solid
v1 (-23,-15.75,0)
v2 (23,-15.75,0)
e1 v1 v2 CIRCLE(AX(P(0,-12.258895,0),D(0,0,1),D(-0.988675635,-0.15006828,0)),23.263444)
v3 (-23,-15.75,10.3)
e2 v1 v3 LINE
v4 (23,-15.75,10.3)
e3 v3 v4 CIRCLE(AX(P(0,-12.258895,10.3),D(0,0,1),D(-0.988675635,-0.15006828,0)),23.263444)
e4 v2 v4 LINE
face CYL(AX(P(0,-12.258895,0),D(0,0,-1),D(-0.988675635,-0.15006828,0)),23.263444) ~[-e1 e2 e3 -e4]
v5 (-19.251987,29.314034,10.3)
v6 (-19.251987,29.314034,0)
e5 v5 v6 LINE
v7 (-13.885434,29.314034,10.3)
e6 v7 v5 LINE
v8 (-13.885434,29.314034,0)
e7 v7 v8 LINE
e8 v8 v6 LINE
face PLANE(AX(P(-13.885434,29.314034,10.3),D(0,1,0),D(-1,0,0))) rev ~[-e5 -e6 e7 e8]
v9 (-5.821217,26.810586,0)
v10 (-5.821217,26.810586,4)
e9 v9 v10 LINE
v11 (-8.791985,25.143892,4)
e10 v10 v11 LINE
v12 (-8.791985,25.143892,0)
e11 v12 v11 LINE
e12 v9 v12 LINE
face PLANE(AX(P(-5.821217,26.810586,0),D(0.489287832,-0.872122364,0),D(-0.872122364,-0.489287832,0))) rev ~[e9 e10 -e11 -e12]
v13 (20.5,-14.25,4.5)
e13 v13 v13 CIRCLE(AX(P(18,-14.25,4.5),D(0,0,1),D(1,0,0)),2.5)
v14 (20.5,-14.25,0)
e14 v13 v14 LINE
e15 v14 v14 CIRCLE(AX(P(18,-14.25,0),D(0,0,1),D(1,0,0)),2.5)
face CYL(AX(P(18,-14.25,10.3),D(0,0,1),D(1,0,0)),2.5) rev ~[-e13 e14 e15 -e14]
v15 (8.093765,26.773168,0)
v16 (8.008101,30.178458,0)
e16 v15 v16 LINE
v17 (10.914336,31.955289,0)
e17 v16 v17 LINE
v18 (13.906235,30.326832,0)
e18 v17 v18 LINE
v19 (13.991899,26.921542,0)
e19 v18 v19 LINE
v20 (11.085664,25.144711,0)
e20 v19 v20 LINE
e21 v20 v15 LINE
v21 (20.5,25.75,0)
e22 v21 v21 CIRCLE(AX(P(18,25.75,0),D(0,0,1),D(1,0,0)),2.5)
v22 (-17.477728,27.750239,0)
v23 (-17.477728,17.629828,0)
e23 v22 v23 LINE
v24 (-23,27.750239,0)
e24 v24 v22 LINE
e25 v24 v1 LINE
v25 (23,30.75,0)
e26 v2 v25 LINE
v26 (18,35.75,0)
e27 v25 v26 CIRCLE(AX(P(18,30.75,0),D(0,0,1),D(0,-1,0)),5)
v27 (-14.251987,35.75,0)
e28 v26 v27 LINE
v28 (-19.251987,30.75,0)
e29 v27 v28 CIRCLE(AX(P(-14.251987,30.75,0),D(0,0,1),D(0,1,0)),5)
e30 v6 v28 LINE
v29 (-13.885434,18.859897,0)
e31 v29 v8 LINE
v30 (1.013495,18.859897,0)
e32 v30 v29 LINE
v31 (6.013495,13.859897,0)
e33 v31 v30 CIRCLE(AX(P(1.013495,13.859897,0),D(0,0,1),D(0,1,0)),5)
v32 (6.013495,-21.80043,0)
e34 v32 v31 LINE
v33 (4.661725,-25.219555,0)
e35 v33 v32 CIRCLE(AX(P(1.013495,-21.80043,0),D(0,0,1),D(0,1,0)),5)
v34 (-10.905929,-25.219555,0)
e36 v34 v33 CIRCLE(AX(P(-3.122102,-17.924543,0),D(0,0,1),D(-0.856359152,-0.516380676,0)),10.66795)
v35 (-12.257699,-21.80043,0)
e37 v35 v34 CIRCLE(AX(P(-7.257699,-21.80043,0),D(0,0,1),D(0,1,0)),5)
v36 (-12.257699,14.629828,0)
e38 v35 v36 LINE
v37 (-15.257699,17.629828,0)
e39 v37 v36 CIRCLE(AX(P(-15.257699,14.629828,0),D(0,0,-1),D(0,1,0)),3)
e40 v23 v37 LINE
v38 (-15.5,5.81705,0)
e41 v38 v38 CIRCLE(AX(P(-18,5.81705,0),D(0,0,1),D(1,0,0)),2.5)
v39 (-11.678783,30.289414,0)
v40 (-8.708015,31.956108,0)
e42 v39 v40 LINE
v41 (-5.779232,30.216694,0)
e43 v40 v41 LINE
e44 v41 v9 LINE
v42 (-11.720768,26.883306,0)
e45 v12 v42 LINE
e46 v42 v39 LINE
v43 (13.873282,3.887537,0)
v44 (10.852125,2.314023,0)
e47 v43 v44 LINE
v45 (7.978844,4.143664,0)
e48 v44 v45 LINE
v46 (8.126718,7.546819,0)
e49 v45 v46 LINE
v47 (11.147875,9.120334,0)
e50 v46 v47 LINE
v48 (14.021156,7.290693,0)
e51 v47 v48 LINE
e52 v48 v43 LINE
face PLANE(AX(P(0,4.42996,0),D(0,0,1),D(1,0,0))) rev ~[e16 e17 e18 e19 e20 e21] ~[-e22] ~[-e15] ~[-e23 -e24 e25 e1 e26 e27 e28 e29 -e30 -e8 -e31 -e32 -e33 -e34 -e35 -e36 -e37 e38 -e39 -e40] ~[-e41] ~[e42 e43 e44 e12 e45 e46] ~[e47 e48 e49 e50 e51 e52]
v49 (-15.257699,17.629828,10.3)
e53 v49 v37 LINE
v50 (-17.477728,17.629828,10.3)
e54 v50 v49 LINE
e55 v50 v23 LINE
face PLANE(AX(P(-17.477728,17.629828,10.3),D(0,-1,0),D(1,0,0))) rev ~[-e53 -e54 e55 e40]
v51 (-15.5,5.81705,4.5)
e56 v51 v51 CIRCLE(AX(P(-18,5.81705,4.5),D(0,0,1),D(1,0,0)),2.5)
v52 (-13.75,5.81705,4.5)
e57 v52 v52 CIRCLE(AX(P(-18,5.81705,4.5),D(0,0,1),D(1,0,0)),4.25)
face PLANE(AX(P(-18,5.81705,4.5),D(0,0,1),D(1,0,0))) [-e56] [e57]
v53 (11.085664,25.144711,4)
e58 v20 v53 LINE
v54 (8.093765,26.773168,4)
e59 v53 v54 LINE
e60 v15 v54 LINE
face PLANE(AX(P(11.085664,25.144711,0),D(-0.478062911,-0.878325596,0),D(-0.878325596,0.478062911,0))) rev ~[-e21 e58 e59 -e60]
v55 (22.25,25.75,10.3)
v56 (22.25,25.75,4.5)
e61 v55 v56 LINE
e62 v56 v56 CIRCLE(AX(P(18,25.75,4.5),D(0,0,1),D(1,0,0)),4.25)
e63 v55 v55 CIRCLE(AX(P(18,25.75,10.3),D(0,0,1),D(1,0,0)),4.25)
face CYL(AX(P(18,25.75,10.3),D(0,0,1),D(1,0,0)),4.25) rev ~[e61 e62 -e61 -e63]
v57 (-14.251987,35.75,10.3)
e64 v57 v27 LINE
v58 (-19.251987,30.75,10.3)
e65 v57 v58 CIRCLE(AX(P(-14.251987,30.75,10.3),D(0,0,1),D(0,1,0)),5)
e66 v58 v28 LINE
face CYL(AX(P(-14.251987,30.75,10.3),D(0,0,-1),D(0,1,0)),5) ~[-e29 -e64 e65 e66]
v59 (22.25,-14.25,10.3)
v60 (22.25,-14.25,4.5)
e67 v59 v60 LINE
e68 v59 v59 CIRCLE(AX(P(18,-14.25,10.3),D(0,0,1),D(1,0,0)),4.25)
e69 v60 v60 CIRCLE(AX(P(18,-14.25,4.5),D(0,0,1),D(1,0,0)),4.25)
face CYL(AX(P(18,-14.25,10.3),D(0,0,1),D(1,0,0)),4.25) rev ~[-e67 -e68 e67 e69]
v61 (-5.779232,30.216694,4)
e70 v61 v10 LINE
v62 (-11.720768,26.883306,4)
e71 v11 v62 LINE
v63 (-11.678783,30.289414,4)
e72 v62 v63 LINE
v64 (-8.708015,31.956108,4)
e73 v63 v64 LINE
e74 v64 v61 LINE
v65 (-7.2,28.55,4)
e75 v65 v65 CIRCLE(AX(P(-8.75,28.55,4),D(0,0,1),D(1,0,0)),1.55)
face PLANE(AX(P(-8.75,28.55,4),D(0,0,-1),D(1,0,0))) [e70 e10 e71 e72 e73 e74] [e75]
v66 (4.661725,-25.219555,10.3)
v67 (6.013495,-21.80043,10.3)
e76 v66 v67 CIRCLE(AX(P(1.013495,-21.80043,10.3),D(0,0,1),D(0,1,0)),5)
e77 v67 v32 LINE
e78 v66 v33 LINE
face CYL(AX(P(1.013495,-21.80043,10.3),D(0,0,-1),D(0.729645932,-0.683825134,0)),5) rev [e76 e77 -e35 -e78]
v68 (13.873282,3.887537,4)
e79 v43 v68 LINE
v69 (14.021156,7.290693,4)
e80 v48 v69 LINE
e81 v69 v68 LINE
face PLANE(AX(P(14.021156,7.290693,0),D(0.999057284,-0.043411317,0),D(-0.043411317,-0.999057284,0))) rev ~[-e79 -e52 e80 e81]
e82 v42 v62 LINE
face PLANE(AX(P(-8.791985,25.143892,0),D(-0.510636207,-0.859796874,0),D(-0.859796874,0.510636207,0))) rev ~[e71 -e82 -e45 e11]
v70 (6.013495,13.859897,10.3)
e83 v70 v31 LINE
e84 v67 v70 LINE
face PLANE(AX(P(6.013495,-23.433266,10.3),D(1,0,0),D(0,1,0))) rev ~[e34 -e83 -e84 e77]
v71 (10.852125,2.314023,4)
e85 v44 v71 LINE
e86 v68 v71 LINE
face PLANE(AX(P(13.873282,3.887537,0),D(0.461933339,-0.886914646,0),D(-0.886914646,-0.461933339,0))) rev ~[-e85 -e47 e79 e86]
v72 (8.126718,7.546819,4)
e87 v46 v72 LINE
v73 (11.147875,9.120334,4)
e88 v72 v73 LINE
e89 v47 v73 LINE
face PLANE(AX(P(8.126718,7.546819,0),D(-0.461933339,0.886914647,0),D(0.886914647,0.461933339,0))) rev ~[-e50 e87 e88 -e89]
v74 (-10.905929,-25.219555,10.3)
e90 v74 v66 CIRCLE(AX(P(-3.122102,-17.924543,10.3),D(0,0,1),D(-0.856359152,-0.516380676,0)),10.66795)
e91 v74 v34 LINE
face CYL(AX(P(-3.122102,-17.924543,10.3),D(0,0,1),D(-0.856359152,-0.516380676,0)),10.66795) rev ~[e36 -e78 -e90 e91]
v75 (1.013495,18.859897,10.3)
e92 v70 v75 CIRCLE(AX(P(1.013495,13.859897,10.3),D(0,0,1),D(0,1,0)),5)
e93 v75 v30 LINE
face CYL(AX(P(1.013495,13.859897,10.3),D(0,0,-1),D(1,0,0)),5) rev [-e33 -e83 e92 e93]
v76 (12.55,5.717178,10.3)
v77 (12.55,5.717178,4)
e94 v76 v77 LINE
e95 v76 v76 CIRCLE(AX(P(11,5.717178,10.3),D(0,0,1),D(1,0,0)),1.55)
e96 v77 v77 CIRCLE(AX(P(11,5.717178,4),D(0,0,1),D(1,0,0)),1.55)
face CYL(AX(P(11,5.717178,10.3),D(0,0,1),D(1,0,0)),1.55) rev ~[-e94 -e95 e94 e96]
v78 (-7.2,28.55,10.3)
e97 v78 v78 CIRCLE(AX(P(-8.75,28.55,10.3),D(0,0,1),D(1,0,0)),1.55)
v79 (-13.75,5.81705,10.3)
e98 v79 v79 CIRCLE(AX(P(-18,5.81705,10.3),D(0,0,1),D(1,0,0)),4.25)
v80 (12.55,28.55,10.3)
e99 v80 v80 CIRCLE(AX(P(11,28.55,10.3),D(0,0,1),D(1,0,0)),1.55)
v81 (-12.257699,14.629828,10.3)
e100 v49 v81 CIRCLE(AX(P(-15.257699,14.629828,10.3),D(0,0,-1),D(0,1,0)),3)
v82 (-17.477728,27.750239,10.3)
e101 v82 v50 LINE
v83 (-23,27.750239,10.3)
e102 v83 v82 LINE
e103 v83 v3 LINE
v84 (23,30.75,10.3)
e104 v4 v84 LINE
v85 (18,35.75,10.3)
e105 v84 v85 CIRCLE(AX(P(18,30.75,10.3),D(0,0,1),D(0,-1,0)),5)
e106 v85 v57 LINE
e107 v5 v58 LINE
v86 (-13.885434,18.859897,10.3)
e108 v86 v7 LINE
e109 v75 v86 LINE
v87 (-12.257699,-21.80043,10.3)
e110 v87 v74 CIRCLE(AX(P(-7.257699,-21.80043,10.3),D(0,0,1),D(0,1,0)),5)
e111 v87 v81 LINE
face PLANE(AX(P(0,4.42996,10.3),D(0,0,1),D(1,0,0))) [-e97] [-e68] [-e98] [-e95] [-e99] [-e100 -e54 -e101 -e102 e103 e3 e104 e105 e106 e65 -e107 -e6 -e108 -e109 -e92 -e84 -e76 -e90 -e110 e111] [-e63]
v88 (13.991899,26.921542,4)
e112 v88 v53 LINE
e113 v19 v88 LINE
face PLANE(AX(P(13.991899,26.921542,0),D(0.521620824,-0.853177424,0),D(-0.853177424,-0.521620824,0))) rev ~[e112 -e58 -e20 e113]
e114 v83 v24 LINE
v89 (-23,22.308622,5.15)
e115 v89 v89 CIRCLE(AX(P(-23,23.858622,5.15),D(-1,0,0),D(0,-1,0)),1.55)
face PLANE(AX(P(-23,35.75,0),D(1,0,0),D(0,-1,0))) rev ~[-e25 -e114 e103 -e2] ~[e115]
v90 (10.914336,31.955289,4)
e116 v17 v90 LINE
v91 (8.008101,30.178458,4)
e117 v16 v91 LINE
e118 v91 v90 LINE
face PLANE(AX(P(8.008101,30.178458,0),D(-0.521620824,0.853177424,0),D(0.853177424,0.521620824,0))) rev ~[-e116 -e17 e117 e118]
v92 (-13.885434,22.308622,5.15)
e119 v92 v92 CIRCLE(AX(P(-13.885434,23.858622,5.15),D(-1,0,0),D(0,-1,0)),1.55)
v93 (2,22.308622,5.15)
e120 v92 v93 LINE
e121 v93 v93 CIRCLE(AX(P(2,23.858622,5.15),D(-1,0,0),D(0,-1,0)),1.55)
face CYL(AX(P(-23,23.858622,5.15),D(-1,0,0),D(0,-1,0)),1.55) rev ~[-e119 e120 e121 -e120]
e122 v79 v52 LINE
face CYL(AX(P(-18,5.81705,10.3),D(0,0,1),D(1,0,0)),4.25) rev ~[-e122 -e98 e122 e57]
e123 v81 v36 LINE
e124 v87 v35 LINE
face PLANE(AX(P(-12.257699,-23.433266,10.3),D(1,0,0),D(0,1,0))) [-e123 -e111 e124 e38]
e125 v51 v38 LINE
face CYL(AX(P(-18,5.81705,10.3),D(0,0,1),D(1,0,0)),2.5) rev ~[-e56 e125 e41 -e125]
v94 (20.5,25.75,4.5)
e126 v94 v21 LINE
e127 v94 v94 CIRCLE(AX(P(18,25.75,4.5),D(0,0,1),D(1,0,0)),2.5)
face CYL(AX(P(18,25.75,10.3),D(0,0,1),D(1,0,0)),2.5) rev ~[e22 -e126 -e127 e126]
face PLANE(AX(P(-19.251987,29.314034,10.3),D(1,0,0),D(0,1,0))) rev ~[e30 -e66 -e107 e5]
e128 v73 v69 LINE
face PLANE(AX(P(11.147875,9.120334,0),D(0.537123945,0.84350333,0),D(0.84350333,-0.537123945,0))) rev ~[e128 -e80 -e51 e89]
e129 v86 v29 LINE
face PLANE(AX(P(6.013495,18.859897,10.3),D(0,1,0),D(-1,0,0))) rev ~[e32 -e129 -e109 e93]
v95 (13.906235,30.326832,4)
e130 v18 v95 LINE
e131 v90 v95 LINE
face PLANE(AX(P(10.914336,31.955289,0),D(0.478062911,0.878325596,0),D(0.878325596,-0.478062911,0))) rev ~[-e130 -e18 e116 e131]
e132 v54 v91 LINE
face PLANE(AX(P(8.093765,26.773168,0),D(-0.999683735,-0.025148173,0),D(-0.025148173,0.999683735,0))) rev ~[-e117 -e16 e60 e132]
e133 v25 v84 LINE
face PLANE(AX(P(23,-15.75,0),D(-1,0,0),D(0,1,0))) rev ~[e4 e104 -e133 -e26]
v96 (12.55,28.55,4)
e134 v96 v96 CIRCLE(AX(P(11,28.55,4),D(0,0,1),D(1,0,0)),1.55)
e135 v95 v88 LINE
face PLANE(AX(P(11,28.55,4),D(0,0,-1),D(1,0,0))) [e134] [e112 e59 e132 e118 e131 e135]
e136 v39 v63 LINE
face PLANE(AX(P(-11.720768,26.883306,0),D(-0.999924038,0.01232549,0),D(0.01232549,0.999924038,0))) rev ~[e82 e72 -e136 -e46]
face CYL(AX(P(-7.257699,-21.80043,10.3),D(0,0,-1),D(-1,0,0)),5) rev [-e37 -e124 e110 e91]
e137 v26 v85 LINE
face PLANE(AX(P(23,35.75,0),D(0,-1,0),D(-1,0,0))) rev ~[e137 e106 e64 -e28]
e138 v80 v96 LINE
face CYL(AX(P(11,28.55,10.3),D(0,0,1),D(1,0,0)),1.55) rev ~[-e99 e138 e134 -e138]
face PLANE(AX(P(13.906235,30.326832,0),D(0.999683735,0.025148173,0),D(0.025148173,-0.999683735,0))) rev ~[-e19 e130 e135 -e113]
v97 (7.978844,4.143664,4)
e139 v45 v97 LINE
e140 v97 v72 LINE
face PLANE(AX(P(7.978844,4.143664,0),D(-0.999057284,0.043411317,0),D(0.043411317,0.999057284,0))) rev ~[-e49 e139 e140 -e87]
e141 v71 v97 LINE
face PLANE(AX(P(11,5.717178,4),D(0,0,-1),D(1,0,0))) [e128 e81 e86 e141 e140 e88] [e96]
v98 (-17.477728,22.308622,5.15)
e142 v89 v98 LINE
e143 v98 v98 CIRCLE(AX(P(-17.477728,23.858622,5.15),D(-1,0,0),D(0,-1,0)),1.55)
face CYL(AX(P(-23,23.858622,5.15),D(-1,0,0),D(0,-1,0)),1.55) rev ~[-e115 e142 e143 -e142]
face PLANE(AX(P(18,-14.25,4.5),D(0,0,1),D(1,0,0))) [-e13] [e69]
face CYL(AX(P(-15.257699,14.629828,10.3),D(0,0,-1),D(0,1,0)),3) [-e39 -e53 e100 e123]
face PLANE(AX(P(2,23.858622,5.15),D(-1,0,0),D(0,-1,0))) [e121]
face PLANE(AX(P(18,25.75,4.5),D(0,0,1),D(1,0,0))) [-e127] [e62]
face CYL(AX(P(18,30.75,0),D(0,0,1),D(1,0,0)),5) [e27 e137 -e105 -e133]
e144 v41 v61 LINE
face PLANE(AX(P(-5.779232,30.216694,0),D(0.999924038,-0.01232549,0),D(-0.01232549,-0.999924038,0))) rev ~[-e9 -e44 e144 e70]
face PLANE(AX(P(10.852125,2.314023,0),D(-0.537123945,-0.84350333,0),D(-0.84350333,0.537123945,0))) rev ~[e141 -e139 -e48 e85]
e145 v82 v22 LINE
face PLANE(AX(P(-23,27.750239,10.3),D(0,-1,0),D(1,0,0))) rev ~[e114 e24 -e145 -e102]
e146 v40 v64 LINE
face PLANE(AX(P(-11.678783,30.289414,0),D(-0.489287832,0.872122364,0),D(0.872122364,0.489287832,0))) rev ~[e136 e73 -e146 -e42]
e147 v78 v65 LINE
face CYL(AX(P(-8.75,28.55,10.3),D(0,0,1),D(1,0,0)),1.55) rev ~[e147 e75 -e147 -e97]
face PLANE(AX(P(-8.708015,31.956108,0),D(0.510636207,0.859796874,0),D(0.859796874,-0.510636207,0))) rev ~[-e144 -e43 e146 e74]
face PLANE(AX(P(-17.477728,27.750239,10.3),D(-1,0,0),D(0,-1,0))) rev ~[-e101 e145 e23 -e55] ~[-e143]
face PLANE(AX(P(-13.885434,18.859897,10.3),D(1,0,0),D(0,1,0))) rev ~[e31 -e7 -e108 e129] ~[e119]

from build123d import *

# Parameters (mm, degrees)
F1_DEPTH  = 10.3
F2_R      = 1.55
F2_R_2    = 2.5
F2_W      = 18.2711938396
F2_H      = 41.0630945116
F2_W_2    = 3.7480126619
F2_H_2    = 6.4359663129
F3_DEPTH  = 10.3
F4_R      = 3
F5_R      = 5
F6_R      = 4.25
F7_DEPTH  = 5.8
F8_R      = 1.55
F9_DEPTH  = 25
F11_DEPTH = 4


with BuildPart() as f1:
    # F0 (on Top) → F1 (new body)
    with BuildSketch(Plane.XY):
        with BuildLine():
            Line((23, -15.75), (23, 35.75))
            Line((23, 35.75), (-23, 35.75))
            Line((-23, 35.75), (-23, -15.75))
            ThreePointArc((-23, -15.75), (0, -35.5223387435), (23, -15.75))
        make_face()
    extrude(amount=F1_DEPTH)

    # F2 (on face) → F3 (cut, through all)
    with BuildSketch(Plane.XY.offset(10.3)):
        with Locations((11, 28.55)):
            Circle(F2_R)
        with Locations((-8.75, 28.55)):
            Circle(F2_R)
        with Locations((11, 5.7171783878)):
            Circle(F2_R)
        with Locations((18, 25.75)):
            Circle(F2_R_2)
        with Locations((18, -14.25)):
            Circle(F2_R_2)
        with Locations((-18, 5.8170498922)):
            Circle(F2_R_2)
        with Locations((-3.1221020035, -2.9017189518)):
            Rectangle(F2_W, F2_H)
        Polygon((-12.2576989233, 17.6298283041), (6.0134949163, 17.6298283041), (6.0134949163, 18.8598968089), (-12.2576989233, 18.8598968089), (-13.8854337856, 18.8598968089), (-13.8854337856, 29.3140336871), (-15.5863631517, 29.3140336871), (-19.2519873381, 29.3140336871), (-23, 29.3140336871), (-23, 27.7502387762), (-17.4777284265, 27.7502387762), (-17.4777284265, 17.6298283041), (-15.5863631517, 17.6298283041), align=None)
        with BuildLine():
            ThreePointArc((-12.2576989233, -23.4332662076), (-3.1221020035, -28.5924931443), (6.0134949163, -23.4332662076))
            Line((6.0134949163, -23.4332662076), (-12.2576989233, -23.4332662076))
        make_face()
        with Locations((-21.125993669, 32.5320168436)):
            Rectangle(F2_W_2, F2_H_2)
    extrude(amount=-F3_DEPTH, mode=Mode.SUBTRACT)

    # F4
    f4_edges = [f1.edges().sort_by_distance(p)[0] for p in [
        (-12.257699, 17.629828, 5.15),
    ]]
    fillet(f4_edges, radius=F4_R)

    # F5
    f5_edges = [f1.edges().sort_by_distance(p)[0] for p in [
        (-19.251987, 35.75, 5.15),
        (23, 35.75, 5.15),
        (-12.257699, -23.433266, 5.15),
        (6.013495, -23.433266, 5.15),
        (6.013495, 18.859897, 5.15),
    ]]
    fillet(f5_edges, radius=F5_R)

    # F6 (on face) → F7 (cut)
    with BuildSketch(Plane.XY.offset(10.3)):
        with Locations((18, 25.75)):
            Circle(F6_R)
        with Locations((-18, 5.8170498922)):
            Circle(F6_R)
        with Locations((18, -14.25)):
            Circle(F6_R)
    extrude(amount=-F7_DEPTH, mode=Mode.SUBTRACT)

    # F8 (on face) → F9 (cut)
    with BuildSketch(Plane(origin=(-23, 0, 0), x_dir=(0, -1, 0), z_dir=(-1, 0, 0))):
        with Locations((-23.8586217165, 5.15)):
            Circle(F8_R)
    extrude(amount=-F9_DEPTH, mode=Mode.SUBTRACT)

    # F10 (on face) → F11 (cut)
    with BuildSketch(Plane(origin=(0, 0, 0), x_dir=(1, 0, 0), z_dir=(0, 0, -1))):
        Polygon((11.0856638946, -25.1447107273), (8.09376493, -26.7731682547), (8.0081010353, -30.1784575274), (10.9143361054, -31.9552892727), (13.90623507, -30.3268317453), (13.9918989647, -26.9215424726), align=None)
        Polygon((-8.7919851376, -25.1438921653), (-11.7207684817, -26.8833062784), (-11.6787833441, -30.2894141131), (-8.7080148624, -31.9561078347), (-5.7792315183, -30.2166937216), (-5.8212166559, -26.8105858869), align=None)
        Polygon((10.8521251413, -2.3140230343), (7.9788435816, -4.1436640952), (8.1267184402, -7.5468194487), (11.1478748587, -9.1203337412), (14.0211564184, -7.2906926803), (13.8732815598, -3.8875373269), align=None)
    extrude(amount=-F11_DEPTH, mode=Mode.SUBTRACT)


solid = f1.part
